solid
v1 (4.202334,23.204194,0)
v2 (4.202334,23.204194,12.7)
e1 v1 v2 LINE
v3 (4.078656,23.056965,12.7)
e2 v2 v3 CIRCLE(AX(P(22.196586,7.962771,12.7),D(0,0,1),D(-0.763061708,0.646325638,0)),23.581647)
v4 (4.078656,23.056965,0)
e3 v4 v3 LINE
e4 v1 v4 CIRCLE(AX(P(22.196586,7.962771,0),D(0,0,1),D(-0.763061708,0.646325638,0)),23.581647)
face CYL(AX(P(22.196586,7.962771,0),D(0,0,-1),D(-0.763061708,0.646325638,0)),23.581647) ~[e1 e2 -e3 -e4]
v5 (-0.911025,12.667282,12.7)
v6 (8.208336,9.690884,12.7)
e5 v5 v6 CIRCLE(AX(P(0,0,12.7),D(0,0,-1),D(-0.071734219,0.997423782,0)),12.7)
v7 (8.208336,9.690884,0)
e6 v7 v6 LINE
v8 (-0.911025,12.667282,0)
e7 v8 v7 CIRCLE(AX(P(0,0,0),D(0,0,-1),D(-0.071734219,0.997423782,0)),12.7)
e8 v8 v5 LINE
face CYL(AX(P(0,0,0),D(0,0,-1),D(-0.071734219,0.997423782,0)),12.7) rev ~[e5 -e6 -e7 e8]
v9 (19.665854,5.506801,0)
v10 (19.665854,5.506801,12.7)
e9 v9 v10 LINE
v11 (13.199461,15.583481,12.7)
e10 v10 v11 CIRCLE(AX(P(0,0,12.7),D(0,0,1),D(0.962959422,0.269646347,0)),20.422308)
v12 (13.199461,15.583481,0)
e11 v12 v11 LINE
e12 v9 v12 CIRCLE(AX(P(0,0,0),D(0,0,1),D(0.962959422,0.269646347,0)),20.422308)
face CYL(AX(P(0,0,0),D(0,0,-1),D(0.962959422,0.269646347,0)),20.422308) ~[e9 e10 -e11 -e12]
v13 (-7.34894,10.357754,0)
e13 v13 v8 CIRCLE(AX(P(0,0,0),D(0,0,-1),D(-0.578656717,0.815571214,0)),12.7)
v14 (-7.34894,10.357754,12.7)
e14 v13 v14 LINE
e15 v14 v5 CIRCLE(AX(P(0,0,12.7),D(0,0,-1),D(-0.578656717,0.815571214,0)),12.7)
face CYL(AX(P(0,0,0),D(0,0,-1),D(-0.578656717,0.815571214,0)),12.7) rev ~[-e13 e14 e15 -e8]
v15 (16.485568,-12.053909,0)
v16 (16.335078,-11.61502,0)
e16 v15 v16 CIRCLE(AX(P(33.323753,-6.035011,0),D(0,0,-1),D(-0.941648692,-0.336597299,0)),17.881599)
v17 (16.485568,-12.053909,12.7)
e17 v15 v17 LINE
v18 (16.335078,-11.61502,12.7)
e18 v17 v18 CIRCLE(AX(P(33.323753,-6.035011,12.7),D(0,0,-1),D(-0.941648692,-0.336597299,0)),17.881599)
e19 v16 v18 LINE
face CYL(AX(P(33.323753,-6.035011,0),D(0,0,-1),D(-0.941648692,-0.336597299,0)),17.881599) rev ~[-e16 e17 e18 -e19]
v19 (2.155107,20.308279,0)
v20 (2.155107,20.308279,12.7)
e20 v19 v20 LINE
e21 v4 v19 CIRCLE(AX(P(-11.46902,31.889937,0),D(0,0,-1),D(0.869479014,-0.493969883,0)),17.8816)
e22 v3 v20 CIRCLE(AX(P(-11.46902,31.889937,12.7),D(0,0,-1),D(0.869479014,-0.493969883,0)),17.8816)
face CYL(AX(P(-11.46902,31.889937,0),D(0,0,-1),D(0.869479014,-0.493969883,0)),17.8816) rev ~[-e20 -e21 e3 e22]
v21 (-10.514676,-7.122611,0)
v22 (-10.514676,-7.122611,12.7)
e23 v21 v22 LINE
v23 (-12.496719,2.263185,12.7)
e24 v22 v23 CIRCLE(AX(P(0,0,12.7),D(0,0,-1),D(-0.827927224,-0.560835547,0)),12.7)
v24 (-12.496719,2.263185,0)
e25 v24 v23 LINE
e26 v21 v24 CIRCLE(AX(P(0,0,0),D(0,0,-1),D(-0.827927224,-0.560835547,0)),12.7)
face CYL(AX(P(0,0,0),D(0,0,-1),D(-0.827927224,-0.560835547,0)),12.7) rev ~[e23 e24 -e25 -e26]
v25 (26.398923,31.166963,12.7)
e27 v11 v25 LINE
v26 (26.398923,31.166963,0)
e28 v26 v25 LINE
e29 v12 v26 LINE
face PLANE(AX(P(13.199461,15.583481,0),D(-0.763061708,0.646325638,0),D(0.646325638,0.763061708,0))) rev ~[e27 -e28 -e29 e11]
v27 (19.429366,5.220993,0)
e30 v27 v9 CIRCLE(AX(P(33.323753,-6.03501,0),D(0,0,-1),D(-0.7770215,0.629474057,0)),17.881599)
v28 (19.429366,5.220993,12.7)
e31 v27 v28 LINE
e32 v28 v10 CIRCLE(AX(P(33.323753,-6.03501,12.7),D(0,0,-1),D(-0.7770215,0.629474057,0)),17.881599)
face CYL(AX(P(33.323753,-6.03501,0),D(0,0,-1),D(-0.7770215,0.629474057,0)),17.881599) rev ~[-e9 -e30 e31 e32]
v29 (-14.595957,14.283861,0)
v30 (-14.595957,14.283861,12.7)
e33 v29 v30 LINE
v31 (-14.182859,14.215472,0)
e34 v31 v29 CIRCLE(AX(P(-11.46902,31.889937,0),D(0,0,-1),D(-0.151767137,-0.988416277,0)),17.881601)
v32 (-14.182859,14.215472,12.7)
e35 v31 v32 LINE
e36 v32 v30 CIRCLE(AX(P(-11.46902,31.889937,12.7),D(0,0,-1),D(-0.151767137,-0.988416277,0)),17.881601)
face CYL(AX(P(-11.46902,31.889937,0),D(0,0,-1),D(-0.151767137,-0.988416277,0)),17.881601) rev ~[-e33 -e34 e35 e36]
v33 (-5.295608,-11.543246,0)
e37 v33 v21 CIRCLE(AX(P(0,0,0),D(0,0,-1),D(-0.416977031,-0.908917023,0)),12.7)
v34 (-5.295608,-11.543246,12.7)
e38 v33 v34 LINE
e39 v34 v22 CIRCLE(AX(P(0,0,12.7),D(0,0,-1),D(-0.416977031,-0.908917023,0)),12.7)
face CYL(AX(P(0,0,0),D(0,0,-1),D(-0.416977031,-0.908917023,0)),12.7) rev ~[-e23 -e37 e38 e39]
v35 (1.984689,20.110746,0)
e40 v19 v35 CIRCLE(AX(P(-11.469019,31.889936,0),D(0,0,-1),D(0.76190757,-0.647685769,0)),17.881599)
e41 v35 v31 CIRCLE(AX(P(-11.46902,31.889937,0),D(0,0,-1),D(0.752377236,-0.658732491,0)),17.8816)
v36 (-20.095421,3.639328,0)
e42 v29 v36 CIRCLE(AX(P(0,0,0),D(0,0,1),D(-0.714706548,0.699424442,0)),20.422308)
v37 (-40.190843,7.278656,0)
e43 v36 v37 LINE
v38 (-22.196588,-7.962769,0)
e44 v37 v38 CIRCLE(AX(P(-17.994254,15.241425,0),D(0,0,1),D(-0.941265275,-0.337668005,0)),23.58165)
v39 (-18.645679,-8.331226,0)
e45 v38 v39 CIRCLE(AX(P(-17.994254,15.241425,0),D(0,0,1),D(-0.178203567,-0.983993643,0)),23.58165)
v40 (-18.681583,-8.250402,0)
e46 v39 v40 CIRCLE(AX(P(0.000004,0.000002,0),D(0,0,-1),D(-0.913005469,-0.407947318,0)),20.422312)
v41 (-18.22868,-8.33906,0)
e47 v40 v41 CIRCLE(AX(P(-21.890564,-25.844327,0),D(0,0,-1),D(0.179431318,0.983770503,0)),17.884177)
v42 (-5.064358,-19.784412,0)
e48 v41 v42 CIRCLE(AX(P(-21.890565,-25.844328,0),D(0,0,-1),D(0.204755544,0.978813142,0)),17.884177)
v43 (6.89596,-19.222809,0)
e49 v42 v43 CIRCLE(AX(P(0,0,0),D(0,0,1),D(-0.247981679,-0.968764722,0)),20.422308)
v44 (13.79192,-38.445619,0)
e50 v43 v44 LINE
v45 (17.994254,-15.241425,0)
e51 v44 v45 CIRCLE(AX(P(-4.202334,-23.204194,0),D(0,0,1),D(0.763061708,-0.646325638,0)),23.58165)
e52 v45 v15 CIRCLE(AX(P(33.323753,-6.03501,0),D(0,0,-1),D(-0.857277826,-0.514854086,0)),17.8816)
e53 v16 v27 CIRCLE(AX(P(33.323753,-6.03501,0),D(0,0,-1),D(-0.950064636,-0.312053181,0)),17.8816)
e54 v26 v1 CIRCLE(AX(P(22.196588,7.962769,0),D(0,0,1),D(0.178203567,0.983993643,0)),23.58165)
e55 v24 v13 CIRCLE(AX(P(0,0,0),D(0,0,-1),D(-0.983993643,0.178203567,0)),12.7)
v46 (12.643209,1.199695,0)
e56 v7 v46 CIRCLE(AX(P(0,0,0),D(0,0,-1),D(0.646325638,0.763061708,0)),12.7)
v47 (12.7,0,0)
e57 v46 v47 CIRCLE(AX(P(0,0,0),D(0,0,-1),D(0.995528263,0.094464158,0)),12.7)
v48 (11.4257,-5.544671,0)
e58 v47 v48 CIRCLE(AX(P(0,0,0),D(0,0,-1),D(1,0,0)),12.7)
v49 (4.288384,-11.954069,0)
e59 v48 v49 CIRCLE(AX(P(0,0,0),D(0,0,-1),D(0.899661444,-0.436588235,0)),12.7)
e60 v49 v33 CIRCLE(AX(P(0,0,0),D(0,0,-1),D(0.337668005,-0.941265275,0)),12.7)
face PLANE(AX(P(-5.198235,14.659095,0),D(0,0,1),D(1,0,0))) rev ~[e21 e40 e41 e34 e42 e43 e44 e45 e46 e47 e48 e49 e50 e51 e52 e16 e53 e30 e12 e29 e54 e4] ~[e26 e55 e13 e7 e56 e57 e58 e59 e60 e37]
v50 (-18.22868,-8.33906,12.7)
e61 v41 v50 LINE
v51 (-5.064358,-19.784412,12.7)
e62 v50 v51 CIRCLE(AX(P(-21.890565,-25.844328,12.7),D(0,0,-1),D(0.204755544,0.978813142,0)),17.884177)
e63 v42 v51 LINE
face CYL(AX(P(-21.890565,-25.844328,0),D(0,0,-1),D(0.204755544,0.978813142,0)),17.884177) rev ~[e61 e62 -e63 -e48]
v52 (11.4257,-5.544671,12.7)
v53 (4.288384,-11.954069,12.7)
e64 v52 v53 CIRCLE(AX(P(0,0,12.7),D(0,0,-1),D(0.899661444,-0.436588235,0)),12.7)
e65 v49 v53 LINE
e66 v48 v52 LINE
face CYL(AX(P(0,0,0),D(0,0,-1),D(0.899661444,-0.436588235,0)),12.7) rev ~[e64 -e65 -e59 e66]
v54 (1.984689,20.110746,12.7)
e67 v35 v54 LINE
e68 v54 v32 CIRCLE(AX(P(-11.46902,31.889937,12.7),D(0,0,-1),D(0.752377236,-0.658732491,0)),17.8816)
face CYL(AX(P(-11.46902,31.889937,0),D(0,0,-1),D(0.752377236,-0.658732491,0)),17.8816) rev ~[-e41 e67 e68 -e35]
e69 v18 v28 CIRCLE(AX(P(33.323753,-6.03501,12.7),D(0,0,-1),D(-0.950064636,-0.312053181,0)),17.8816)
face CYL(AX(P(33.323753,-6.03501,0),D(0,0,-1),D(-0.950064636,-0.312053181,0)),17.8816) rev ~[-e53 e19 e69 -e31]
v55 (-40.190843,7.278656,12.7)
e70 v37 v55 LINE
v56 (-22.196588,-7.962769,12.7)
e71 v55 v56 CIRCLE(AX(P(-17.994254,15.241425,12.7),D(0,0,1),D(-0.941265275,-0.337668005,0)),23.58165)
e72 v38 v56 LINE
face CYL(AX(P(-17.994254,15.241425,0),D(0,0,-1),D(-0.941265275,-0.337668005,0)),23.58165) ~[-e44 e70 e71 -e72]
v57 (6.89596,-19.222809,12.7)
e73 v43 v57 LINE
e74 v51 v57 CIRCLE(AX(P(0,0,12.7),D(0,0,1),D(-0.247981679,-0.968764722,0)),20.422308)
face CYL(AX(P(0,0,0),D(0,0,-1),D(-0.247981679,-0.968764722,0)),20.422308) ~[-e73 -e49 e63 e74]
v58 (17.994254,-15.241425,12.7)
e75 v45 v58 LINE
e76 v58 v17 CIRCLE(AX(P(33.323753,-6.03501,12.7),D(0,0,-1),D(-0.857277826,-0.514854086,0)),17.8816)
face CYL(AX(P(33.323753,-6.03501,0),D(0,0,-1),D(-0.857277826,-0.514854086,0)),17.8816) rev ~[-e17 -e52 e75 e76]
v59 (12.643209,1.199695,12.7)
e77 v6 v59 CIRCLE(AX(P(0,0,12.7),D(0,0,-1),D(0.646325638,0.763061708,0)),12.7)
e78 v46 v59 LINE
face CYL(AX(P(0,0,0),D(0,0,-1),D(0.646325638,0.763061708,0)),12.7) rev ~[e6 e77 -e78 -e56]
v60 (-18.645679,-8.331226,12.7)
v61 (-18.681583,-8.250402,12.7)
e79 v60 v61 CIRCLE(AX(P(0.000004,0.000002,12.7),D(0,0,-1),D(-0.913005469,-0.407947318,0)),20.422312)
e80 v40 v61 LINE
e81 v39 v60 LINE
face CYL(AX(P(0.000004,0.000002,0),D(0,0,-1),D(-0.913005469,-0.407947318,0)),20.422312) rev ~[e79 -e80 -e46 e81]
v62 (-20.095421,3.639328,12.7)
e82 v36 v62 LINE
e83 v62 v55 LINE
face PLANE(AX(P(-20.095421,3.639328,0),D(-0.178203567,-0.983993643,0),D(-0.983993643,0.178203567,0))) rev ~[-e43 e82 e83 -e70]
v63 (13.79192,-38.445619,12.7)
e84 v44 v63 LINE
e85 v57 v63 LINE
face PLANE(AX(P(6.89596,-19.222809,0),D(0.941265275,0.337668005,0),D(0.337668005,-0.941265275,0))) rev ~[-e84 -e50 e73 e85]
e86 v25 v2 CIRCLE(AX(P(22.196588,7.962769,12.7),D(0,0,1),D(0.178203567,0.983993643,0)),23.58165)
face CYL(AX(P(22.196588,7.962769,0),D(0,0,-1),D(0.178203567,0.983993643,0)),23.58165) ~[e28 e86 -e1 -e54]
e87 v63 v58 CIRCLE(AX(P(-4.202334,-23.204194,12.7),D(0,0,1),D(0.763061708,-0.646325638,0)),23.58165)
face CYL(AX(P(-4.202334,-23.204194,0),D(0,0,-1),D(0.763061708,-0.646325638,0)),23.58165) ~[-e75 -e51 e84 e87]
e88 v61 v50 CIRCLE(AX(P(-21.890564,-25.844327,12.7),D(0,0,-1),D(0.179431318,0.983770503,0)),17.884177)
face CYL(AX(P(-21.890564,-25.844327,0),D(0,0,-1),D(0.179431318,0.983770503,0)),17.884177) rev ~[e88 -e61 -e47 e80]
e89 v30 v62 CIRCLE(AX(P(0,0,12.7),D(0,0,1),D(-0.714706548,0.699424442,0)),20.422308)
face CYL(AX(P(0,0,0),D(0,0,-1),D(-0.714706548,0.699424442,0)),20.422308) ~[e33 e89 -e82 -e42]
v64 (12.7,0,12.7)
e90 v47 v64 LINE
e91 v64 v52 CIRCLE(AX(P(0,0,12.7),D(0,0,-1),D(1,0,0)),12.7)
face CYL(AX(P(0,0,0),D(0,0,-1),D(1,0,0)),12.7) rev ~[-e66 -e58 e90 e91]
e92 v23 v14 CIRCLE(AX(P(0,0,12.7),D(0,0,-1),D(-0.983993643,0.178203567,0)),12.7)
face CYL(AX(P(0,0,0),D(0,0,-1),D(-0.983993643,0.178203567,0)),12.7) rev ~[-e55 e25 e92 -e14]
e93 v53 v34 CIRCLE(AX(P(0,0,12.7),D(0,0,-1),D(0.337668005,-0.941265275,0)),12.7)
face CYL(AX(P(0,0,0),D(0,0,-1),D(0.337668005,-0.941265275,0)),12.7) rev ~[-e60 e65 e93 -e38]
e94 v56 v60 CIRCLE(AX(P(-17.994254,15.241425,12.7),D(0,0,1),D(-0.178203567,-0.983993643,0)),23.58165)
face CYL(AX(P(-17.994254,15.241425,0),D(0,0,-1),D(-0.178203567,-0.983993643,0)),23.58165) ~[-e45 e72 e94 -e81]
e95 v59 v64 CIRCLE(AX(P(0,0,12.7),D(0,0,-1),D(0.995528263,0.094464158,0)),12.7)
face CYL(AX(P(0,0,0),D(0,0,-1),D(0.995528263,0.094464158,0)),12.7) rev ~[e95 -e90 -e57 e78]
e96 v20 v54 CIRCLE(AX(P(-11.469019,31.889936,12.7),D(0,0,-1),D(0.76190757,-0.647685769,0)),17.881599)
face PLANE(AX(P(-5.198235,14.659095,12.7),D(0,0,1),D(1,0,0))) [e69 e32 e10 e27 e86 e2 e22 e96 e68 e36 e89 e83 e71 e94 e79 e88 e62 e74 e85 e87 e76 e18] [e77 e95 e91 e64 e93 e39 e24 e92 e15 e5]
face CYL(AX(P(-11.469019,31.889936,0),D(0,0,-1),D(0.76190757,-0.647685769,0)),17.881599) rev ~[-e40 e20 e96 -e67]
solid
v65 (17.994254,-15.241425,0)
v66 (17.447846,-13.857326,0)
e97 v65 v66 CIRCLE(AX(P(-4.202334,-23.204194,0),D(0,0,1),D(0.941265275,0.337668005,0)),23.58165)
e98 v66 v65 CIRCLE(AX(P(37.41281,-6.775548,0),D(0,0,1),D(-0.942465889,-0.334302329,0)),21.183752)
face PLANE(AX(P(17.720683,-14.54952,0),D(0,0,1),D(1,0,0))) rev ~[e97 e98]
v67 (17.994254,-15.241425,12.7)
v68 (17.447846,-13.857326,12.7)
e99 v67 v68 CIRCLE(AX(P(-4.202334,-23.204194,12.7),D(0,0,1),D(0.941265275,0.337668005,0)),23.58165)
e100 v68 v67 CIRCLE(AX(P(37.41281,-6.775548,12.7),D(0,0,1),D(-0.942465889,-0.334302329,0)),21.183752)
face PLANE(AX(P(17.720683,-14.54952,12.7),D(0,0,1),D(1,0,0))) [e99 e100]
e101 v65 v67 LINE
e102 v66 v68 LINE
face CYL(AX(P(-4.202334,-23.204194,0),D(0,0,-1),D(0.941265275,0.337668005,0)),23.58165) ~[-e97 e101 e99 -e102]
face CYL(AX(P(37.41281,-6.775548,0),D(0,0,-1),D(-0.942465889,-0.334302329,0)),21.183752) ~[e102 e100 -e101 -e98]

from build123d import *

# Parameters (mm, degrees)
F1_DEPTH = 12.7


# Not quite as in the source:
# - a feature of the source that left no trace in its solid (it failed there, or was rolled back) is left out


with BuildPart() as f1:
    # F0 (on Top) → F1 (new body)
    with BuildSketch(Plane.XY):
        with BuildLine():
            ThreePointArc((-7.3489403011, 10.3577544116), (-4.2883836636, 11.9540689957), (-0.9110245856, 12.667282037))
            ThreePointArc((-0.9110245856, 12.667282037), (0.2194109686, 16.5124994793), (1.9846889119, 20.1107456498))
            ThreePointArc((1.9846889119, 20.1107456498), (-5.3432740228, 15.0903277504), (-14.1828590922, 14.2154720724))
            ThreePointArc((-14.1828590922, 14.2154720724), (-10.6043004202, 12.5728851855), (-7.3489403011, 10.3577544116))
        make_face()
        with BuildLine():
            ThreePointArc((-18.6815829969, -8.250401529), (-18.454845536, -8.2932697378), (-18.2286800533, -8.3390598448))
            ThreePointArc((-18.2286800533, -8.3390598448), (-14.3209728725, -8.0523772846), (-10.5146757481, -7.1226114531))
            ThreePointArc((-10.5146757481, -7.1226114531), (-12.4259555067, -2.6240483505), (-12.4967192607, 2.263185304))
            Line((-12.4967192607, 2.263185304), (-20.0954213497, 3.6393281571))
            ThreePointArc((-20.0954213497, 3.6393281571), (-20.2794337822, -2.4114796562), (-18.6815829969, -8.250401529))
        make_face()
        with BuildLine():
            ThreePointArc((-5.0643582643, -19.7844116422), (0.9578833515, -20.3998315714), (6.8959600381, -19.2228094672))
            Line((6.8959600381, -19.2228094672), (4.2883836636, -11.9540689957))
            ThreePointArc((4.2883836636, -11.9540689957), (-0.5438926438, -12.6883482295), (-5.295608296, -11.5432461975))
            ThreePointArc((-5.295608296, -11.5432461975), (-8.2083355971, -9.6908836917), (-10.5146757481, -7.1226114531))
            ThreePointArc((-10.5146757481, -7.1226114531), (-14.3209728725, -8.0523772846), (-18.2286800533, -8.3390598448))
            ThreePointArc((-18.2286800533, -8.3390598448), (-10.156448241, -12.3478720374), (-5.0643582643, -19.7844116422))
        make_face()
        with BuildLine():
            ThreePointArc((6.8959600381, -19.2228094672), (12.2279291244, -16.3569073478), (16.4855681798, -12.0539085133))
            ThreePointArc((16.4855681798, -12.0539085133), (16.4088993742, -11.8349525851), (16.3350776353, -11.615020425))
            ThreePointArc((16.3350776353, -11.615020425), (14.1333458958, -8.375267358), (11.4257003337, -5.5446705839))
            ThreePointArc((11.4257003337, -5.5446705839), (8.4854702857, -9.4491689598), (4.2883836636, -11.9540689957))
            Line((4.2883836636, -11.9540689957), (6.8959600381, -19.2228094672))
        make_face()
        with BuildLine():
            ThreePointArc((12.6432089432, 1.1996948024), (16.2054891655, 2.9248067913), (19.4293657833, 5.2209930447))
            ThreePointArc((19.4293657833, 5.2209930447), (19.546868725, 5.3645101816), (19.6658540094, 5.5068007715))
            ThreePointArc((19.6658540094, 5.5068007715), (17.187702303, 11.0296671845), (13.1994613117, 15.58348131))
            Line((13.1994613117, 15.58348131), (8.2083355971, 9.6908836917))
            ThreePointArc((8.2083355971, 9.6908836917), (11.2570777566, 5.879472798), (12.6432089432, 1.1996948024))
        make_face()
        with BuildLine():
            ThreePointArc((-0.9110245856, 12.667282037), (3.940485221, 12.0732173104), (8.2083355971, 9.6908836917))
            Line((8.2083355971, 9.6908836917), (13.1994613117, 15.58348131))
            ThreePointArc((13.1994613117, 15.58348131), (8.0325348446, 18.7762896395), (2.1551065289, 20.3082787185))
            ThreePointArc((2.1551065289, 20.3082787185), (2.070257967, 20.2092013887), (1.9846889119, 20.1107456498))
            ThreePointArc((1.9846889119, 20.1107456498), (0.2194109686, 16.5124994793), (-0.9110245856, 12.667282037))
        make_face()
        with BuildLine():
            ThreePointArc((-18.6815829969, -8.250401529), (-20.4319782656, -8.0197287805), (-22.1965884409, -7.9627687686))
            ThreePointArc((-22.1965884409, -7.9627687686), (-20.4281162197, -8.2142893772), (-18.6456789889, -8.3312258223))
            ThreePointArc((-18.6456789889, -8.3312258223), (-18.6636747448, -8.2908331113), (-18.6815829969, -8.250401529))
        make_face()
        with BuildLine():
            ThreePointArc((-40.1908426994, 7.2786563143), (-33.2356793414, -2.7528291756), (-22.1965884409, -7.9627687686))
            Line((-22.1965884409, -7.9627687686), (-40.1908426994, 7.2786563143))
        make_face()
        with BuildLine():
            Line((13.1994613117, 15.58348131), (26.3989226233, 31.1669626201))
            Line((26.3989226233, 31.1669626201), (4.2023341824, 23.2041938515))
            ThreePointArc((4.2023341824, 23.2041938515), (4.1403450601, 23.1307053406), (4.0786560627, 23.0569647133))
            ThreePointArc((4.0786560627, 23.0569647133), (3.1814863156, 21.6374106747), (2.1551065289, 20.3082787185))
            ThreePointArc((2.1551065289, 20.3082787185), (8.0325348446, 18.7762896395), (13.1994613117, 15.58348131))
        make_face()
        with BuildLine():
            Line((4.2023341824, 23.2041938515), (26.3989226233, 31.1669626201))
            ThreePointArc((26.3989226233, 31.1669626201), (14.2338196723, 30.1593572095), (4.2023341824, 23.2041938515))
        make_face()
        with BuildLine():
            ThreePointArc((13.7919200761, -38.4456189344), (19.0018596691, -27.4065280339), (17.9942542585, -15.2414250829))
            Line((17.9942542585, -15.2414250829), (13.7919200761, -38.4456189344))
        make_face()
        with BuildLine():
            ThreePointArc((11.4257003337, -5.5446705839), (14.1333458958, -8.375267358), (16.3350776353, -11.615020425))
            ThreePointArc((16.3350776353, -11.615020425), (15.7367201589, -2.8026923129), (19.4293657833, 5.2209930447))
            ThreePointArc((19.4293657833, 5.2209930447), (16.2054891655, 2.9248067913), (12.6432089432, 1.1996948024))
            ThreePointArc((12.6432089432, 1.1996948024), (12.6857942908, 0.6005191177), (12.7, 0))
            ThreePointArc((12.7, 0), (12.3773259277, -2.8446094426), (11.4257003337, -5.5446705839))
        make_face()
        with BuildLine():
            Line((-20.0954213497, 3.6393281571), (-12.4967192607, 2.263185304))
            ThreePointArc((-12.4967192607, 2.263185304), (-10.7164855769, 6.8151989612), (-7.3489403011, 10.3577544116))
            ThreePointArc((-7.3489403011, 10.3577544116), (-10.6043004202, 12.5728851855), (-14.1828590922, 14.2154720724))
            ThreePointArc((-14.1828590922, 14.2154720724), (-14.3896083966, 14.2484575715), (-14.5959573306, 14.2838614619))
            ThreePointArc((-14.5959573306, 14.2838614619), (-18.1438546347, 9.373964351), (-20.0954213497, 3.6393281571))
        make_face()
        with BuildLine():
            Line((-40.1908426994, 7.2786563143), (-22.1965884409, -7.9627687686))
            ThreePointArc((-22.1965884409, -7.9627687686), (-20.4319782656, -8.0197287805), (-18.6815829969, -8.250401529))
            ThreePointArc((-18.6815829969, -8.250401529), (-20.2794337822, -2.4114796562), (-20.0954213497, 3.6393281571))
            Line((-20.0954213497, 3.6393281571), (-40.1908426994, 7.2786563143))
        make_face()
        with BuildLine():
            Line((13.7919200761, -38.4456189344), (17.9942542585, -15.2414250829))
            ThreePointArc((17.9942542585, -15.2414250829), (17.16114084, -13.6849496708), (16.4855681798, -12.0539085133))
            ThreePointArc((16.4855681798, -12.0539085133), (12.2279291244, -16.3569073478), (6.8959600381, -19.2228094672))
            Line((6.8959600381, -19.2228094672), (13.7919200761, -38.4456189344))
        make_face()
    extrude(amount=F1_DEPTH)


with BuildPart() as f1b:
    # F0 (on Top) → F1, piece 2 (new body)
    with BuildSketch(Plane.XY):
        with BuildLine():
            ThreePointArc((17.4478455198, -13.8573257269), (17.7088929014, -14.5541746878), (17.9942542585, -15.2414250829))
            ThreePointArc((17.9942542585, -15.2414250829), (17.7319700442, -14.5450643934), (17.4478455198, -13.8573257269))
        make_face()
    extrude(amount=F1_DEPTH)


solid = Compound([f1.part, f1b.part])
